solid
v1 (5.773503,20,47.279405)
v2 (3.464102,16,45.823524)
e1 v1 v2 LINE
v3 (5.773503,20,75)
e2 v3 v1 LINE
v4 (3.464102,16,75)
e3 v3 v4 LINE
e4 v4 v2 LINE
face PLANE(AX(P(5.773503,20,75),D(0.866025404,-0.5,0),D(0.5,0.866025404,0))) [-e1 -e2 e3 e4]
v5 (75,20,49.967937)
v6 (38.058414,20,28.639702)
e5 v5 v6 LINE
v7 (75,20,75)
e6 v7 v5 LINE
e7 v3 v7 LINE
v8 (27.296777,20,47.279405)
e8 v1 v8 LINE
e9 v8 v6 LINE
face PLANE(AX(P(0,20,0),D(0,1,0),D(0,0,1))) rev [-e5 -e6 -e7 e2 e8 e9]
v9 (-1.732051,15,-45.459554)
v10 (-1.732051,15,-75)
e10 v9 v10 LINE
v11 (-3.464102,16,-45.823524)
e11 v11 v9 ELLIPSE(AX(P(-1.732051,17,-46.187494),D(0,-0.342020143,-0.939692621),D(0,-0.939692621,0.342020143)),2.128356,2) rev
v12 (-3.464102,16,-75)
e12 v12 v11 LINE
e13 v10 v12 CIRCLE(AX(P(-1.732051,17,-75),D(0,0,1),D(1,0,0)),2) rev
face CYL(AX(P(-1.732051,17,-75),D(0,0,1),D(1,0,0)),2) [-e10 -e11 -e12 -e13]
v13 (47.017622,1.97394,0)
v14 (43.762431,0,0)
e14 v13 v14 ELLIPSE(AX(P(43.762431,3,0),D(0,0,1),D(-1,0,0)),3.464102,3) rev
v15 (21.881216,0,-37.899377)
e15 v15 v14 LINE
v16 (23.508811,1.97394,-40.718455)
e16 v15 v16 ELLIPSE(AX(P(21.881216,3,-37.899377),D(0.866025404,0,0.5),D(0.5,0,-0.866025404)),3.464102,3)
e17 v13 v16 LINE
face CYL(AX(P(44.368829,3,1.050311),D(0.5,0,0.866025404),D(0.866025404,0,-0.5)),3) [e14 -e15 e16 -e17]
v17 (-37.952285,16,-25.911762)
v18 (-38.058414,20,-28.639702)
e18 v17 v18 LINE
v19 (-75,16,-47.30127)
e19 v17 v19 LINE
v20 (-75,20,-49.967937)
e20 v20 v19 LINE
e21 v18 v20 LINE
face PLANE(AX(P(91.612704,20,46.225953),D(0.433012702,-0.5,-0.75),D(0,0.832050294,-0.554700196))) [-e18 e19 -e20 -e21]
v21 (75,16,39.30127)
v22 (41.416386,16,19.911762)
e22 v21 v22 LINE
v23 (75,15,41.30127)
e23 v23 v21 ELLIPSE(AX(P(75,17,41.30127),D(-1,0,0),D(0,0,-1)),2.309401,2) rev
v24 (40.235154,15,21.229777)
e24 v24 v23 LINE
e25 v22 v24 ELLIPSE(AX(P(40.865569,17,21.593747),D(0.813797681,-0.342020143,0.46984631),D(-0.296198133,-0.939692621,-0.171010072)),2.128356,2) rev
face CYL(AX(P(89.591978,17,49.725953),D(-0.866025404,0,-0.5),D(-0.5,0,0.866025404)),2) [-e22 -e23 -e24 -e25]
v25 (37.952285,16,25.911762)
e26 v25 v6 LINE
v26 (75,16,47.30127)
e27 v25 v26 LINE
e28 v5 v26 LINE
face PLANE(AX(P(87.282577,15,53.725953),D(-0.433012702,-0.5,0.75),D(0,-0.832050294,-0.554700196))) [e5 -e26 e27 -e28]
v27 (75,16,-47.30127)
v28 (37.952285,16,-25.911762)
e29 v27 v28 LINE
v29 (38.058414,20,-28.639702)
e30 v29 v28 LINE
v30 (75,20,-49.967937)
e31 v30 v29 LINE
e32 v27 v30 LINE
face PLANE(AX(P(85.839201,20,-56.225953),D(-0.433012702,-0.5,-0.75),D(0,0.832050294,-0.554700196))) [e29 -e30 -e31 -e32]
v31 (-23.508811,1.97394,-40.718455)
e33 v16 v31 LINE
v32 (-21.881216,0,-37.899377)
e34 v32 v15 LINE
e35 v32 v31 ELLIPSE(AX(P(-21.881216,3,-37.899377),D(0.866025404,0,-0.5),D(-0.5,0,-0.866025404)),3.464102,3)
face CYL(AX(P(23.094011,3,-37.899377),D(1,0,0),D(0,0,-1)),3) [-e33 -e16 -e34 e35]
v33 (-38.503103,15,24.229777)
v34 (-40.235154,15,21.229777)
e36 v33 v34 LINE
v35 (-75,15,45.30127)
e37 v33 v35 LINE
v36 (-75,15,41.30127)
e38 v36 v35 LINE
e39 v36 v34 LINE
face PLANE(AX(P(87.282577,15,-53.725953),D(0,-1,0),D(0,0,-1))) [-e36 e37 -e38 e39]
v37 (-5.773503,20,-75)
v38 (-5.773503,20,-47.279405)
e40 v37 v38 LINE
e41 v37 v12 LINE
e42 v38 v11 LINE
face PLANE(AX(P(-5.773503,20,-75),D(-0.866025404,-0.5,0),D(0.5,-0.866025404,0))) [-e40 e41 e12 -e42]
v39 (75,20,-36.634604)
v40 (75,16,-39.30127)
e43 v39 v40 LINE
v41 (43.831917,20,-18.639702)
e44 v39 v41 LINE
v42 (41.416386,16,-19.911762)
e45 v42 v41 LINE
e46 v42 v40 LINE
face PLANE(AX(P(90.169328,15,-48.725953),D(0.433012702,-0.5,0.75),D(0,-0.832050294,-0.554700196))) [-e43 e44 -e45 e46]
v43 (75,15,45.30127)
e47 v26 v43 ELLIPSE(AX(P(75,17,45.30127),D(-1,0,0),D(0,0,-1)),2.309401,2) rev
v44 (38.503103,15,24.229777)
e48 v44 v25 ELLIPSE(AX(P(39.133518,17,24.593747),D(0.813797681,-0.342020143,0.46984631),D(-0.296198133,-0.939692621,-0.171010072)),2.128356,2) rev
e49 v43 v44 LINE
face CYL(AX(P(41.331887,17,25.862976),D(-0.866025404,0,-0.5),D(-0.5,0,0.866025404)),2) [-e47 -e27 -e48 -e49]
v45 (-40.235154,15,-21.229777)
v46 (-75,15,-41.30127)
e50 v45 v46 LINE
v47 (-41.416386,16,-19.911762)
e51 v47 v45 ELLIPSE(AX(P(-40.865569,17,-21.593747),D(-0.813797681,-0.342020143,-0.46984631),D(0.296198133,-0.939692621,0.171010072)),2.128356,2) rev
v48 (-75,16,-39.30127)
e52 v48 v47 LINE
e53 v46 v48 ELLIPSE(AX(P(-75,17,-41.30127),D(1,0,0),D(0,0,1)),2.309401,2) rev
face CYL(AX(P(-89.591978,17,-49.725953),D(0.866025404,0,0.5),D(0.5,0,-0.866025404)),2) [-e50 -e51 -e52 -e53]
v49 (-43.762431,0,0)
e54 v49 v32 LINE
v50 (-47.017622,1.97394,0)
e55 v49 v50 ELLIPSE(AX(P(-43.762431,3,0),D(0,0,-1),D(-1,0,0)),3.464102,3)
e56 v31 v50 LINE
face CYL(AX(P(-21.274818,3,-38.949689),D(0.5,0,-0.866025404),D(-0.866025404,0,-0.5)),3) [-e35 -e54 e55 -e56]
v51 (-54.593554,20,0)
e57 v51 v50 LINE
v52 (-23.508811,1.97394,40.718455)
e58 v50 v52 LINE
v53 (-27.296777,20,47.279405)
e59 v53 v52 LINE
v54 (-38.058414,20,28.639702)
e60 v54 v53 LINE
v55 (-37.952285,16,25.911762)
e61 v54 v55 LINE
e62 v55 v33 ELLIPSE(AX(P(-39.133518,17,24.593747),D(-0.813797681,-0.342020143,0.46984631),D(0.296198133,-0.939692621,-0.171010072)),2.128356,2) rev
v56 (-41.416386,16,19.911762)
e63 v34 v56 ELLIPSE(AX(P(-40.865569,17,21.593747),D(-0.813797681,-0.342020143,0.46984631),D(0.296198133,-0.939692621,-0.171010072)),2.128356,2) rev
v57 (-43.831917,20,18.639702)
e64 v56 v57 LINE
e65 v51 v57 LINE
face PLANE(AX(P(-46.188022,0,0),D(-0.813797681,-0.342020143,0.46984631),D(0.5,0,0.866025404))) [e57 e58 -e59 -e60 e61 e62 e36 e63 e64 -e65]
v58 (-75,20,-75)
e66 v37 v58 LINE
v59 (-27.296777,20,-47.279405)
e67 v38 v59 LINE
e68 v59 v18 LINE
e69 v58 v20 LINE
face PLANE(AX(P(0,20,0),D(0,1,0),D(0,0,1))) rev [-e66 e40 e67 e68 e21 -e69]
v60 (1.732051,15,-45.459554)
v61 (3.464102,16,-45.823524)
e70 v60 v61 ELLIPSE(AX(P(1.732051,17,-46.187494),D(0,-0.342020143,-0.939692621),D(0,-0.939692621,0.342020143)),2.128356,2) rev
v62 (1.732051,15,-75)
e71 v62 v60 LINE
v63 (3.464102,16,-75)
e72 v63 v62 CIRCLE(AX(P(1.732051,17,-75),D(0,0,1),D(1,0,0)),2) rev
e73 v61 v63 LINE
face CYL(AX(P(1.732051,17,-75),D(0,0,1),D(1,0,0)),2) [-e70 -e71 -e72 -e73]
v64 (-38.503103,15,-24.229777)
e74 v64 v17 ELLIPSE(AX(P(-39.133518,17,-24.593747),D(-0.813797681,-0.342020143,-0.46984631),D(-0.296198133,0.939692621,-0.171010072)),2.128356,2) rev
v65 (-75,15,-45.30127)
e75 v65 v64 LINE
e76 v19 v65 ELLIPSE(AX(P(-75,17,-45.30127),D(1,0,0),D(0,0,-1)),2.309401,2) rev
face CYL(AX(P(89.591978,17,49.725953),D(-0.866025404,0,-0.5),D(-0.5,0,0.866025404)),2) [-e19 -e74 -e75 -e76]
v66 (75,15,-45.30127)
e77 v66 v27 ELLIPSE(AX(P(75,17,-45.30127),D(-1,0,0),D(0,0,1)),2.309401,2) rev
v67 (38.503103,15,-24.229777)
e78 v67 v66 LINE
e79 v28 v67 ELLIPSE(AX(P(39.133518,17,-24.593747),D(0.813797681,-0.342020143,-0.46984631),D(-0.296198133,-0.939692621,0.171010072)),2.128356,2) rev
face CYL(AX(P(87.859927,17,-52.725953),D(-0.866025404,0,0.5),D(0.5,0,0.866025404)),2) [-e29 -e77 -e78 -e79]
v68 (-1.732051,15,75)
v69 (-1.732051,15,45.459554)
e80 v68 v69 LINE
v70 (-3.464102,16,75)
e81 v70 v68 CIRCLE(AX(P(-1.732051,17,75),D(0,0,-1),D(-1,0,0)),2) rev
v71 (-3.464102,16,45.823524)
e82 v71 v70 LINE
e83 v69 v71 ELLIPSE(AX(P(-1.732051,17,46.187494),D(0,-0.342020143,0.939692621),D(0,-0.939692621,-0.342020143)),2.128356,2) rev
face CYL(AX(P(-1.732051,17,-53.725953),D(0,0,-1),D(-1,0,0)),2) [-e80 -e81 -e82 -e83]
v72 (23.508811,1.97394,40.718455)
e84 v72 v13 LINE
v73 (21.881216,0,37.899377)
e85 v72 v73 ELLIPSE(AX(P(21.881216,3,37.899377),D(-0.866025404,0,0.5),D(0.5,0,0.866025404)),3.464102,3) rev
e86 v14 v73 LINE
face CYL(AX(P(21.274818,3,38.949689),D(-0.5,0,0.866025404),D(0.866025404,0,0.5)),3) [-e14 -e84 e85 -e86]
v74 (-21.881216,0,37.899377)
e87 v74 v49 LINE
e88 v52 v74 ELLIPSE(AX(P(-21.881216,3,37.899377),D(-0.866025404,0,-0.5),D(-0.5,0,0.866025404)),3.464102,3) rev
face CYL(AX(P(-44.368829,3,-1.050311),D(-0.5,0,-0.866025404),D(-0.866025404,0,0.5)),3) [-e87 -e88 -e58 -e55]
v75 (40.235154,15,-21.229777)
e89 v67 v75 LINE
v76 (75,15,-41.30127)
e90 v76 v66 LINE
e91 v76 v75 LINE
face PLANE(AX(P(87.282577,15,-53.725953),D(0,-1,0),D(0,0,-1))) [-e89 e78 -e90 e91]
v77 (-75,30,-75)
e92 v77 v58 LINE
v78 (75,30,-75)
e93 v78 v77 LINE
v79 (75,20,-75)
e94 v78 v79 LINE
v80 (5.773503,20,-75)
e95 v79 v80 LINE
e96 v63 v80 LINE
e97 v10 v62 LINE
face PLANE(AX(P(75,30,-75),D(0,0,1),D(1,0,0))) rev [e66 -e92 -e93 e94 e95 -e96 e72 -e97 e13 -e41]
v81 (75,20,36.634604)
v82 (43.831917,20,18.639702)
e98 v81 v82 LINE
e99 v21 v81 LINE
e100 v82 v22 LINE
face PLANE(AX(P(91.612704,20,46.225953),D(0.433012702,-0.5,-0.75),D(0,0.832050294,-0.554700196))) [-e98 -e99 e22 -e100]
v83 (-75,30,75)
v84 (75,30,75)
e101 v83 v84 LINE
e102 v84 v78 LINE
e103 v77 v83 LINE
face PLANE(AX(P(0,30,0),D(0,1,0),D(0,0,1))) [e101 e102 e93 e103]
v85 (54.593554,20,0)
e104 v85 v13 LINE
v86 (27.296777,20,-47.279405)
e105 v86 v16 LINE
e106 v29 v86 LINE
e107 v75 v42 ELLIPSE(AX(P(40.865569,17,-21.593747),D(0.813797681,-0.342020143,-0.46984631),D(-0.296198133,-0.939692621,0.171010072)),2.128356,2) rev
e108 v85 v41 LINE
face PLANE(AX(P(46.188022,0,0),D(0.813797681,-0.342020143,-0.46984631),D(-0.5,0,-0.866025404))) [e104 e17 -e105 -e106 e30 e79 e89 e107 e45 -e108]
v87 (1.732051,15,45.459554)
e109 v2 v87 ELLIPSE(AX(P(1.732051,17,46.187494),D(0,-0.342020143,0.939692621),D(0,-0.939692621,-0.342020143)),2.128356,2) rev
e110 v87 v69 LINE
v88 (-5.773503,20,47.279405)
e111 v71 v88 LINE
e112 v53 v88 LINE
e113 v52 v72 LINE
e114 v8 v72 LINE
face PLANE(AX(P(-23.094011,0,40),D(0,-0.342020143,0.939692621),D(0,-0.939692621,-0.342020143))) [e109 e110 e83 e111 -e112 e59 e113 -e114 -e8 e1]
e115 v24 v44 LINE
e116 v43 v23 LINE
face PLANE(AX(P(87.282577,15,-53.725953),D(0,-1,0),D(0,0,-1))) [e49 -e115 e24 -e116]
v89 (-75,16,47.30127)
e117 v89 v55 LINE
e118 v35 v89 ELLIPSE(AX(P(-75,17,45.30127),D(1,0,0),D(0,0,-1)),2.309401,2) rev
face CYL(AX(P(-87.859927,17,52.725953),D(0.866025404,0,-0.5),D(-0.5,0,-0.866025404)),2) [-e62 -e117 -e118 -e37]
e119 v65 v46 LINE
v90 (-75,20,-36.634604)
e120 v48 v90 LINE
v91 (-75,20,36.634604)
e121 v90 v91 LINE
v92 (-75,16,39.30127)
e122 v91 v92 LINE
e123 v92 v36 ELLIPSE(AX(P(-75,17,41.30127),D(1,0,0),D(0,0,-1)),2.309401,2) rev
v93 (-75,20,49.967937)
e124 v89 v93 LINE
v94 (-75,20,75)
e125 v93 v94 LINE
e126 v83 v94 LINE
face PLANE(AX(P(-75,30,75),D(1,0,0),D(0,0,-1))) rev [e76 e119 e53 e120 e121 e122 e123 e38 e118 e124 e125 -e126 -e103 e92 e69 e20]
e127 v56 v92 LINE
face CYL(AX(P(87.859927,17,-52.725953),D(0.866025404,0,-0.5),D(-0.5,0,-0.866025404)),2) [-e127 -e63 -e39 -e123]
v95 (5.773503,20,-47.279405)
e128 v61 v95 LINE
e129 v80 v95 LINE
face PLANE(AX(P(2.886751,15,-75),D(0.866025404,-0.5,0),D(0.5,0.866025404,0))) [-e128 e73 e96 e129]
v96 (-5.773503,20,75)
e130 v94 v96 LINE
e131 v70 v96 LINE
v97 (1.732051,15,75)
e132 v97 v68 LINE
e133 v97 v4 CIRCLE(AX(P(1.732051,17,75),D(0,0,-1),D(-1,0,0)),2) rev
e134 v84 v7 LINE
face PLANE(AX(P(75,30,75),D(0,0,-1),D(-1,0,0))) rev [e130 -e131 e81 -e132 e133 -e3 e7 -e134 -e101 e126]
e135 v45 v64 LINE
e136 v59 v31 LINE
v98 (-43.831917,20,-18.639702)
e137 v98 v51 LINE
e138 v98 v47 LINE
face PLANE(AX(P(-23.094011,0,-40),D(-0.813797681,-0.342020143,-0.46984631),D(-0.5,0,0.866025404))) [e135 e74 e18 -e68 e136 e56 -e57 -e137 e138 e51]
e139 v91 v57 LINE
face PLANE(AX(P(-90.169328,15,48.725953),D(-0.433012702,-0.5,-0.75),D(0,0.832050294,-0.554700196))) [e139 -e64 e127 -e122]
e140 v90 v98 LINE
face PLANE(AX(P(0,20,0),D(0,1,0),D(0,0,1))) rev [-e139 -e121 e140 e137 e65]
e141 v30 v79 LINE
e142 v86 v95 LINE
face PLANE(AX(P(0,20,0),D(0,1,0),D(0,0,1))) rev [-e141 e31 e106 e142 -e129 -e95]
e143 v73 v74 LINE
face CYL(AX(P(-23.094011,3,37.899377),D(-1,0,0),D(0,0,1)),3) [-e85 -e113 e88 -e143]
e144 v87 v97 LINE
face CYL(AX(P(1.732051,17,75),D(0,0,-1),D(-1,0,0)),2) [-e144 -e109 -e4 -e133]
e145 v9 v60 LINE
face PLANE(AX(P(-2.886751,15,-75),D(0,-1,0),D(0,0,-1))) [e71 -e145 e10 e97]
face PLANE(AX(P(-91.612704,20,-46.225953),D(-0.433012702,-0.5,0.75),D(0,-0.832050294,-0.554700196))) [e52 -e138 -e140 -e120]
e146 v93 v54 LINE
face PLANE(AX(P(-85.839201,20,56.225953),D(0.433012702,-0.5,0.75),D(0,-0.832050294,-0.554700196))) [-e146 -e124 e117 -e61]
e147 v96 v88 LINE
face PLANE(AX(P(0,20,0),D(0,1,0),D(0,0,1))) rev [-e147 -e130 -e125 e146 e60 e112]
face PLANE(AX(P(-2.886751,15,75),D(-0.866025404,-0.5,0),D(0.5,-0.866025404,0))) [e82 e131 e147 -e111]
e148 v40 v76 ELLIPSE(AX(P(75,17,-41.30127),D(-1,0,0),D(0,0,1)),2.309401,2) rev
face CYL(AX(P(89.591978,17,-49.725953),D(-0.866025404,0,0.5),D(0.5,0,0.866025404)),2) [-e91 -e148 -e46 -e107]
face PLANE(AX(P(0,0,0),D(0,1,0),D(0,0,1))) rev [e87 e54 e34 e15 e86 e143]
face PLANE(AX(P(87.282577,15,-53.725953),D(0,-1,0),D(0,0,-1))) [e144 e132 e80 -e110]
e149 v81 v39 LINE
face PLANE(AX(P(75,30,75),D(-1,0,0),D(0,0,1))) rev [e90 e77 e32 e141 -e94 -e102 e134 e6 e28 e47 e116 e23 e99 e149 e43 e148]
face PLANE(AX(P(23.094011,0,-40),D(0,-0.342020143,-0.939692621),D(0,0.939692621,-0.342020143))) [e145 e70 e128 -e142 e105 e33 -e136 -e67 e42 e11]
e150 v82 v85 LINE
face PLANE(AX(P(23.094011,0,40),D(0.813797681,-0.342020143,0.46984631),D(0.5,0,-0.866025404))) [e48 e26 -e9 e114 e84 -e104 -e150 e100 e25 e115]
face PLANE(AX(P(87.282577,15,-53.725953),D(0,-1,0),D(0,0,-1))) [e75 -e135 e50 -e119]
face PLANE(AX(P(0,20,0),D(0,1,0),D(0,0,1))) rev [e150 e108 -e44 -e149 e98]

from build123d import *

# Parameters (mm, degrees)
HEXAGON_DEPTH = 20
HEXAGON_DRAFT = -20.000000000000043
BASE_DEPTH    = 10
SMALL_DEPTH   = 75
FILLET_2_R    = 3
ARRAY_START   = -102.451905284
ARRAY_DEPTH   = 204.903810568
ARRAY_2_DEPTH = 204.903810568
ARRAY_START_2 = 45.459553514
ARRAY_3_DEPTH = 29.540446486
FILLET2_R     = 2
CROQUIS4_W    = 26.916537621276092
CROQUIS4_H    = 24.058782859612524
CROQUIS4_W_2  = 36.99619518821565
CROQUIS4_H_2  = 32.17850701075816
TRIM_DEPTH    = 179.30560151606045


# Read off the part's stored shape, not the designer's step: array
with BuildPart() as part:
    # Croquis1 → hexagon (with draft: the straight prism first)
    with BuildSketch(Plane(origin=(0, 0, 0), x_dir=(1, 0, 0), z_dir=(0, 1, 0))):
        Polygon((46.18802153516988, 0), (23.09401076758485, 39.9999999999999), (-23.09401076758513, 39.99999999999974), (-46.18802153516988, -3.2253e-13), (-23.09401076758457, -40.00000000000006), (23.09401076758541, -39.99999999999958), align=None)
    extrude(amount=HEXAGON_DEPTH)
    # hexagon: the draft: its side faces are tilted about the plane it starts from
    hexagon_sides = [part.faces().sort_by_distance(p)[0] for p in [
        (34.641016151, 10, -20),
        (0, 10, -40),
        (-34.641016151, 10, -20),
        (-34.641016151, 10, 20),
        (0, 10, 40),
        (34.641016151, 10, 20),
    ]]
    draft(hexagon_sides, Plane(origin=(0, 0, 0), x_dir=(1, 0, 0), z_dir=(0, 1, 0)), HEXAGON_DRAFT)

    # Croquis2 → base (add)
    with BuildSketch(Plane(origin=(0, 20, 0), x_dir=(1, 0, 0), z_dir=(0, 1, 0))):
        Polygon((74.99999999999999, -74.99999999999999), (-75.00000000000001, -75.00000000000001), (-75.00000000000001, 74.99999999999999), (74.99999999999999, 75.00000000000001), align=None)
    extrude(amount=BASE_DEPTH)

    # Croquis3 → small (add, through all)
    with BuildSketch(Plane.XY):
        Polygon((-5.773502691896257, 20), (-2.886751345948127, 15), (2.886751345948127, 15), (5.7735026918962555, 20), (2.8867513459481215, 25.000000000000007), (-2.8867513459481278, 25.000000000000007), align=None)
    extrude(amount=-SMALL_DEPTH)

    # fillet 2
    fillet_2_edges = [part.edges().sort_by_distance(p)[0] for p in [
        (4.2277e-13, 0, 39.99999999999982),
        (-34.64101615137723, 0, 20.000000000000206),
        (-34.641016151377514, 0, -19.9999999999997),
        (-1.4921e-13, 0, -39.999999999999815),
        (34.641016151377364, 0, -19.999999999999957),
        (34.64101615137765, 0, 19.999999999999787),
    ]]
    fillet(fillet_2_edges, radius=FILLET_2_R)

    # array outline → array (add)
    with BuildSketch(Plane(origin=(0, 0, 0), x_dir=(0.500000000000004, 0, -0.8660254037844363), z_dir=(0.8660254037844363, 0, 0.5000000000000042)).offset(ARRAY_START)):
        Polygon((-5.773502692, 20), (-2.886751346, 15), (2.886751346, 15), (5.773502692, 20), (2.886751346, 25), (-2.886751346, 25), align=None)
    extrude(amount=ARRAY_DEPTH)

    # array 2 outline → array 2 (add)
    with BuildSketch(Plane(origin=(0, 0, 0), x_dir=(0.49999999999999767, 0, 0.86602540378444), z_dir=(0.8660254037844399, 0, -0.49999999999999795)).offset(ARRAY_START)):
        Polygon((5.773502692, -20), (2.886751346, -15), (-2.886751346, -15), (-5.773502692, -20), (-2.886751346, -25), (2.886751346, -25), align=None)
    extrude(amount=ARRAY_2_DEPTH)

    # array 3 outline → array 3 (add)
    with BuildSketch(Plane.XY.offset(ARRAY_START_2)):
        Polygon((-5.773502692, 20), (-2.886751346, 15), (2.886751346, 15), (5.773502692, 20), align=None)
    extrude(amount=ARRAY_3_DEPTH)

    # fillet2
    fillet2_edges = [part.edges().sort_by_distance(p)[0] for p in [
        (-2.886751346, 15, 60.229776756999996),
        (62.604164741938675, 15, -39.477864699543005),
        (65.49091608793843, 15, 34.47786469945364),
        (-62.60416474193839, 15, -39.477864699543446),
        (2.886751346, 15, 60.229776756999996),
        (-62.60416474193865, 15, 39.47786469954298),
        (-65.49091608793839, 15, -34.47786469945361),
        (2.886751345948127, 15, -60.22977675699644),
        (-2.886751345948127, 15, -60.22977675699643),
        (62.60416474193845, 15, 39.47786469954348),
        (65.49091608793866, 15, -34.47786469945315),
        (-65.49091608793867, 15, 34.47786469945314),
    ]]
    fillet(fillet2_edges, radius=FILLET2_R)

    # Croquis4 → trim (cut, through all)
    with BuildSketch(Plane(origin=(-1.388e-14, 0, -75), x_dir=(-1, 0, 1.9e-16), z_dir=(-1.9e-16, 0, -1))):
        with Locations((-88.45826881063805, 17.97060857019374)):
            Rectangle(CROQUIS4_W, CROQUIS4_H)
        with Locations((93.49809759410783, 13.910746494620925)):
            Rectangle(CROQUIS4_W_2, CROQUIS4_H_2)
    extrude(amount=-TRIM_DEPTH, mode=Mode.SUBTRACT)


solid = part.part
